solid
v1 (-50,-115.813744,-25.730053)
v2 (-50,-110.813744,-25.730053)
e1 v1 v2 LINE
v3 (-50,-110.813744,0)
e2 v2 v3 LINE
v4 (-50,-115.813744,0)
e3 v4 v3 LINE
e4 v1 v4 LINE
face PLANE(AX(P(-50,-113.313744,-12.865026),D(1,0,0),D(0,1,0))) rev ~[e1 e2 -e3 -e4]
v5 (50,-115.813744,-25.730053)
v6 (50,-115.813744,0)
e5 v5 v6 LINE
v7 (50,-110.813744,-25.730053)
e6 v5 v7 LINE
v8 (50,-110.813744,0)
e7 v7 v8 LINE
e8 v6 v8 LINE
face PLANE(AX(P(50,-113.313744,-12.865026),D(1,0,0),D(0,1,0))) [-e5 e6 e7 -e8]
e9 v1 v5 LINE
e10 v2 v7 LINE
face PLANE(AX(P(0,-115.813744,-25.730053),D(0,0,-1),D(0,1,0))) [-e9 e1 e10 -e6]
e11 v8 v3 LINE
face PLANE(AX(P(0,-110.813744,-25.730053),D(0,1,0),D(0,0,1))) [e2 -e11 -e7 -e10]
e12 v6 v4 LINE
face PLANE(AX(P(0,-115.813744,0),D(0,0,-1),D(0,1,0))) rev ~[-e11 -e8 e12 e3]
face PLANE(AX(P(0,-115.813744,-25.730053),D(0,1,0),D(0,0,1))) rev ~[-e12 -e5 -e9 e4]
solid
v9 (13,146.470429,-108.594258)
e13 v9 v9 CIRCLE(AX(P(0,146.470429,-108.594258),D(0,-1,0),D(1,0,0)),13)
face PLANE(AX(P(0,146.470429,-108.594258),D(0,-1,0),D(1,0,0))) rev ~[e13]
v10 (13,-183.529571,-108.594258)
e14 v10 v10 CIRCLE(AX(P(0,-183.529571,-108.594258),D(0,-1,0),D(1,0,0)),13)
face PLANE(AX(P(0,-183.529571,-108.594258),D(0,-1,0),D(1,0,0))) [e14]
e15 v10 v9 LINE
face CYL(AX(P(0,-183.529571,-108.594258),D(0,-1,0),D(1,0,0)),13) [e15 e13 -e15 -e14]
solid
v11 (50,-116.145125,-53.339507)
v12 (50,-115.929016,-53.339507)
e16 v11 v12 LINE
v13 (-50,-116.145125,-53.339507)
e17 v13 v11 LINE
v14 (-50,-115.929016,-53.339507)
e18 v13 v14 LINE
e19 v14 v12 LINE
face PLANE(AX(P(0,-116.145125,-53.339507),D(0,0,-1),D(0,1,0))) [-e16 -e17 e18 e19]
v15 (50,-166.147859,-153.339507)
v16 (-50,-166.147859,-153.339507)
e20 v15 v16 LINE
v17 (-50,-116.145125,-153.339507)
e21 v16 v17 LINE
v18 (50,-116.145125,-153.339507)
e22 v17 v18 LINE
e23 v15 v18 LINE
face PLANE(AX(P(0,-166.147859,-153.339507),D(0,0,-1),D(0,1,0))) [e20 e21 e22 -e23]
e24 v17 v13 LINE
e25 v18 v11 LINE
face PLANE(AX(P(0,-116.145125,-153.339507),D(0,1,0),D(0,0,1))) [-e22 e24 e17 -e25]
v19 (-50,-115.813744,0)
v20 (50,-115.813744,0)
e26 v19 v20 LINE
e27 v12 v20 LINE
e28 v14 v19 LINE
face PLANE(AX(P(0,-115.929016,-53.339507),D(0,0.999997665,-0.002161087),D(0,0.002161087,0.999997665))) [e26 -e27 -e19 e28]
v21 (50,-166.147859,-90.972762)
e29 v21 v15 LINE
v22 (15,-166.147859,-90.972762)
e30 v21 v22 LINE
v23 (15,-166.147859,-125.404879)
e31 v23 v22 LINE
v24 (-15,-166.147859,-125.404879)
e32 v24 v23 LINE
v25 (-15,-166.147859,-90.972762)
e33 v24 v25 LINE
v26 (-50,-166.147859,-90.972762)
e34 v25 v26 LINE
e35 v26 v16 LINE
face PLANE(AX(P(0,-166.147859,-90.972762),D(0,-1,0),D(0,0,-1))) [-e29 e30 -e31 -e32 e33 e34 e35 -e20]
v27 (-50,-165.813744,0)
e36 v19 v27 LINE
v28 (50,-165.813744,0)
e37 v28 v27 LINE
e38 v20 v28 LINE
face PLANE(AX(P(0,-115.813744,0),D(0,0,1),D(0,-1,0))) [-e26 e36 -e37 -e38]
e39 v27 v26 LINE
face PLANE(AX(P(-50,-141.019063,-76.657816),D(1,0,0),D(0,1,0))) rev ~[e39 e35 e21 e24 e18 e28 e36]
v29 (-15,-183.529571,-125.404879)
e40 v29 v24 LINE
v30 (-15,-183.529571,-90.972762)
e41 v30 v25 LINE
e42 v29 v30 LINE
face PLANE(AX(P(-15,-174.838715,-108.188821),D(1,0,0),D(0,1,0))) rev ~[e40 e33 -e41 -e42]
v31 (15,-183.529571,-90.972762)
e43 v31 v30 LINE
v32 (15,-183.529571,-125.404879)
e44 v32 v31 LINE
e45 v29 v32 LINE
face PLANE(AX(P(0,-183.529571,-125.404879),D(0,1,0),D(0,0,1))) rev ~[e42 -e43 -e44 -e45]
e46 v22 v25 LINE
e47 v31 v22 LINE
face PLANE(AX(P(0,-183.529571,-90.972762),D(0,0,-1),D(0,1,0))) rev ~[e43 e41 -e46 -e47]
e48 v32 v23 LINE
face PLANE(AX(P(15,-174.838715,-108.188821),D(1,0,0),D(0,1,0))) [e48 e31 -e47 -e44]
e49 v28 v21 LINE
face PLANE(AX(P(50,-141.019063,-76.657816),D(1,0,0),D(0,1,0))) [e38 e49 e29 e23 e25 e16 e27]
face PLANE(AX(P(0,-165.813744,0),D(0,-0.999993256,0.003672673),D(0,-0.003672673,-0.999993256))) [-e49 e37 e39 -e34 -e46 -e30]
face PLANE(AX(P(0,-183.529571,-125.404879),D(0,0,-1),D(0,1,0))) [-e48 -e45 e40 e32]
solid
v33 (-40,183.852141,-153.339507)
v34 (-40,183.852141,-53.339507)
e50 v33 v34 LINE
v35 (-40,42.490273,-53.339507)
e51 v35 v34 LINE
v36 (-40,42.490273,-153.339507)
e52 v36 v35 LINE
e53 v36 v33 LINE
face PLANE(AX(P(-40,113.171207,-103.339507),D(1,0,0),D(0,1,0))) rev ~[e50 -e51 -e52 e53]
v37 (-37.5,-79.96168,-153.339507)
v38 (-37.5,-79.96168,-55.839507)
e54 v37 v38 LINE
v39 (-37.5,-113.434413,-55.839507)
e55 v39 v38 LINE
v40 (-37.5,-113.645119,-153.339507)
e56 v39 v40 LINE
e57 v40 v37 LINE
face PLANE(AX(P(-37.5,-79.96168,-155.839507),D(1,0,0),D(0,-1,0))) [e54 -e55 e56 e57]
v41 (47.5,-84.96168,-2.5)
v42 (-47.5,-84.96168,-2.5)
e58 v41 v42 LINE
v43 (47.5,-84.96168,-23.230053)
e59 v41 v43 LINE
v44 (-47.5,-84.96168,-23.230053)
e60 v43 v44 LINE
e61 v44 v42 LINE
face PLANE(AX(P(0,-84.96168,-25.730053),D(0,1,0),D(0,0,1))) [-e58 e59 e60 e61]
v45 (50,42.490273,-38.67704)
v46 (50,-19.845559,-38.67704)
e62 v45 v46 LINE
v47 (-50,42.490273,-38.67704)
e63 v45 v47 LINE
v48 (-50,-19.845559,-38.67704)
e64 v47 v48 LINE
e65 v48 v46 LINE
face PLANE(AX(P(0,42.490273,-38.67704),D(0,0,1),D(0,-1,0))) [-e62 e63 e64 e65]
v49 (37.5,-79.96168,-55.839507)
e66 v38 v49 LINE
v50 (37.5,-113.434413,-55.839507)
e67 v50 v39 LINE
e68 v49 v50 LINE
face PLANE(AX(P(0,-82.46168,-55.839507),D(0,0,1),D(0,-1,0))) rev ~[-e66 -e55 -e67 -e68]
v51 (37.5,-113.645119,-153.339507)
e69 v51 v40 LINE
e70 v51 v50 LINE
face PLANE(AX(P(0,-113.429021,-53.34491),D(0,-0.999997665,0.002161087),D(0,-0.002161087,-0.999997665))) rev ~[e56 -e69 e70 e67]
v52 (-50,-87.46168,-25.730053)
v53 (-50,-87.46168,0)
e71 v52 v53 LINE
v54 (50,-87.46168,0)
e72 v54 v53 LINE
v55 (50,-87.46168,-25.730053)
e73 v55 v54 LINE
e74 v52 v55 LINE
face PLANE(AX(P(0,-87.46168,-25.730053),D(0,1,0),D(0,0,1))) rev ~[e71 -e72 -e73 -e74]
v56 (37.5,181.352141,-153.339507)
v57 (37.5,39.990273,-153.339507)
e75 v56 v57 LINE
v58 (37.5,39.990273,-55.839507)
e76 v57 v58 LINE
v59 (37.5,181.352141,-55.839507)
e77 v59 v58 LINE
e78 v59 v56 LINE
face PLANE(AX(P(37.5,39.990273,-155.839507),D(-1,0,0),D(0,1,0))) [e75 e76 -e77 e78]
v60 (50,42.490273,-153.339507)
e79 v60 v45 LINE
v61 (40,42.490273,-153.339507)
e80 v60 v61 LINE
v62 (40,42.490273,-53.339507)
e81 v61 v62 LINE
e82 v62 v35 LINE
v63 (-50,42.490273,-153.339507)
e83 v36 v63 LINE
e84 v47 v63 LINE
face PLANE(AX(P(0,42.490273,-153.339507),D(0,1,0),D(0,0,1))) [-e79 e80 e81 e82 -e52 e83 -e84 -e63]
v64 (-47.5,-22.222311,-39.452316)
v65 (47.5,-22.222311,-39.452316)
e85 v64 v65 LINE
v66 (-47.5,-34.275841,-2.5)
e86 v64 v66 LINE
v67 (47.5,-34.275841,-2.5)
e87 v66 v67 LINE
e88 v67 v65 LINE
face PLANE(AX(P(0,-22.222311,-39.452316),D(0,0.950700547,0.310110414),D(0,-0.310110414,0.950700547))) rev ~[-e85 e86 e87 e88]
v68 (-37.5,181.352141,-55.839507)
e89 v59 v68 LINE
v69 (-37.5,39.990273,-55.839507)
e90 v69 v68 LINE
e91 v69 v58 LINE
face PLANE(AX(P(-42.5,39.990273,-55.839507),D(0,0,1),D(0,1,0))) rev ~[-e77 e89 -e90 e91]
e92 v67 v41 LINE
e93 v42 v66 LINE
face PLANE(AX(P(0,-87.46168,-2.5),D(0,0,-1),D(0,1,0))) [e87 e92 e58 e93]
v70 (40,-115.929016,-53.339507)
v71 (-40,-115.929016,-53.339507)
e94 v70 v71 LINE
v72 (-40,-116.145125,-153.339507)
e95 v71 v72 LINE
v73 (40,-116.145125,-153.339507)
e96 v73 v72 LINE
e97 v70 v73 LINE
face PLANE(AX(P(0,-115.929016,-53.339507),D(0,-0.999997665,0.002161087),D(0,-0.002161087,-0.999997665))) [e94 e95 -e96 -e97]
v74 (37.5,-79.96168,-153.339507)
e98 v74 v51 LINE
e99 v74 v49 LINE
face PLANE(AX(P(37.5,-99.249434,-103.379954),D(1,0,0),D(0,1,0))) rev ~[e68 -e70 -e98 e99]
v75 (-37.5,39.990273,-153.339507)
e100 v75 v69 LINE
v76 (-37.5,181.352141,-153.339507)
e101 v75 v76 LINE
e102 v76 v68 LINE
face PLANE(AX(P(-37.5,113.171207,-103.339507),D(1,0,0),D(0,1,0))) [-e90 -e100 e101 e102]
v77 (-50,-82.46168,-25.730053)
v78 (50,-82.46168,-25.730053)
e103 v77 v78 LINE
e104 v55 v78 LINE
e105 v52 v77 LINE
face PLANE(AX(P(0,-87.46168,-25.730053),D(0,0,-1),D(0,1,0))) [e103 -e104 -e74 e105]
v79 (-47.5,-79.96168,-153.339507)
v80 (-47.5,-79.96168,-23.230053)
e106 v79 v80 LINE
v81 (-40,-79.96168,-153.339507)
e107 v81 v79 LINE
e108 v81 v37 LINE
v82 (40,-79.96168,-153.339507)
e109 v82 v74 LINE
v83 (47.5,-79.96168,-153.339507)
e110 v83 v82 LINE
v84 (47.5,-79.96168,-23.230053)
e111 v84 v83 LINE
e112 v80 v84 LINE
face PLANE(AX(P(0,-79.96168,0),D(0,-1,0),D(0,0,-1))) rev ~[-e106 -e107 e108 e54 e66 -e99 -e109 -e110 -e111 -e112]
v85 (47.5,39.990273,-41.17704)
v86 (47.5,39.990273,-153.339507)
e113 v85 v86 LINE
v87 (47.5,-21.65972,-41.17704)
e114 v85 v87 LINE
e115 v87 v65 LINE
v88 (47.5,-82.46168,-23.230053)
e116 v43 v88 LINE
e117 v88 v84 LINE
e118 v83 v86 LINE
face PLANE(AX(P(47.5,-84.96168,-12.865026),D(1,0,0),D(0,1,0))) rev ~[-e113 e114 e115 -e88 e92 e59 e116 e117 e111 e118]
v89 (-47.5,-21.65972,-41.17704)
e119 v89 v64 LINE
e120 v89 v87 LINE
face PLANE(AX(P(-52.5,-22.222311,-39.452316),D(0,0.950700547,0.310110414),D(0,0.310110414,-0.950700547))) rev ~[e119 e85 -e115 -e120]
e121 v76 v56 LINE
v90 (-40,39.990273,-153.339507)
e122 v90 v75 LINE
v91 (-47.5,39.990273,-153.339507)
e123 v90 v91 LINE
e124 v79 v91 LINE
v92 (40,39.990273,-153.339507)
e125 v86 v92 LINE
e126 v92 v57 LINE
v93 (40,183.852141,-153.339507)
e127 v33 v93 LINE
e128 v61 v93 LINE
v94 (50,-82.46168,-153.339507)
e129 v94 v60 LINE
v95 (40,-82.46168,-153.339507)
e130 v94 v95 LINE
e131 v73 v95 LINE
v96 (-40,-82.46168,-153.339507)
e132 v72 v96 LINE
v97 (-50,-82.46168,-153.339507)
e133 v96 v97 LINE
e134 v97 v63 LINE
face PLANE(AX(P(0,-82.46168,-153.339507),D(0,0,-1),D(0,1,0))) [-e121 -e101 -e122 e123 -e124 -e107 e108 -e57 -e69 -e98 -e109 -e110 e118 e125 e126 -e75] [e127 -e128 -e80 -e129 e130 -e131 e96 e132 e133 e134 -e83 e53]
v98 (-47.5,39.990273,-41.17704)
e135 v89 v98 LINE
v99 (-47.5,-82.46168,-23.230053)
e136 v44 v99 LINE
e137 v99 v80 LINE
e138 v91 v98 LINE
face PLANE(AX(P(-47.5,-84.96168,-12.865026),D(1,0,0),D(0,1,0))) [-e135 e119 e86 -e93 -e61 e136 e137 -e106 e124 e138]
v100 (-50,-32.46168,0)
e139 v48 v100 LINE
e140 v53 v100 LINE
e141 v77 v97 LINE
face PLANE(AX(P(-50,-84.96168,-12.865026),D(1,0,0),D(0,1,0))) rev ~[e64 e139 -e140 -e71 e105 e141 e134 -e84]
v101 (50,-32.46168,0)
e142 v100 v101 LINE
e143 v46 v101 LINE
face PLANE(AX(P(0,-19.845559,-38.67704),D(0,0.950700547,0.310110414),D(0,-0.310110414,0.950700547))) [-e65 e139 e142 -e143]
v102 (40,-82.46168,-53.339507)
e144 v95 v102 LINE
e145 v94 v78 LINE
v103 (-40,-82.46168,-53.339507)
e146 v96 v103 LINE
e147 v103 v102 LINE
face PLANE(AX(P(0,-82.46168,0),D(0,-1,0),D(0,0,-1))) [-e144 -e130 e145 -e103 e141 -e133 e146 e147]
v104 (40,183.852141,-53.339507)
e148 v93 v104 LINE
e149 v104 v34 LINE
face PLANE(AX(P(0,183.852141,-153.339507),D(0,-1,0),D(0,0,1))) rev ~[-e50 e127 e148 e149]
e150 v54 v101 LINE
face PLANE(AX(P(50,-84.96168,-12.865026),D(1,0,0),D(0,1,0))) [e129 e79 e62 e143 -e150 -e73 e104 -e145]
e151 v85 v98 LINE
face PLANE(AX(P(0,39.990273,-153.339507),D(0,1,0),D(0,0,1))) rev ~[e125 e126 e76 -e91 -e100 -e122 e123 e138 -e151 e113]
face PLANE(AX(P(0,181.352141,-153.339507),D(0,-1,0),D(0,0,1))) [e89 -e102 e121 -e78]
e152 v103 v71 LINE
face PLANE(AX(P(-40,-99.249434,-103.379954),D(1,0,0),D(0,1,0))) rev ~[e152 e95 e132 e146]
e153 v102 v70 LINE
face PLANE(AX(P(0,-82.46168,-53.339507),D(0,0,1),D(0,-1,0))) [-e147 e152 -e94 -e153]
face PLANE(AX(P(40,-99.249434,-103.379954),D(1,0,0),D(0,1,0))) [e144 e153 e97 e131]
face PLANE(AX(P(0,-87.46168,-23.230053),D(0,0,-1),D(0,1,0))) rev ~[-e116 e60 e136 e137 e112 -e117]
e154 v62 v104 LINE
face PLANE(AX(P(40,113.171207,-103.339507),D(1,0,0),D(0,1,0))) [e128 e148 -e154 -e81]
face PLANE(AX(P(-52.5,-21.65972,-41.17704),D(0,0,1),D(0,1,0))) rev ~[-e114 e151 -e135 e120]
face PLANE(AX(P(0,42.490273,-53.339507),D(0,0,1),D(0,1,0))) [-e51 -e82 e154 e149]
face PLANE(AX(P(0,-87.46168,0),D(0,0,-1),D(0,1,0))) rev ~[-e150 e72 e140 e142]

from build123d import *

# Parameters (mm, degrees)
F0_W        = 124.9519532199
F0_H        = 100
F1_DEPTH    = 50
F0_W_2      = 141.3618674554
F2_DEPTH    = 40
F0_W_3      = 5
F0_H_2      = 25.7300529629
F3_DEPTH    = 50
F4_DEPTH    = 50
F0_W_4      = 17.3817112001
F0_H_3      = 34.4321173714
F5_DEPTH    = 15
F6_T        = 2.5
F6_T3_DEPTH = 105
F6_T5_DEPTH = 105
F6_T7_DEPTH = 85
F7_R        = 13
F8_DEPTH    = 330


# Not quite as in the source:
# - a shell that OpenCascade refuses in one call is made with other operations: the cavity is built on its own and cut out


with BuildPart() as f1:
    # F0 (on Right) → F1 (new body, symmetric)
    with BuildSketch(Plane.YZ):
        Polygon((-82.4616801739, -53.3395072201), (42.490273046, -53.3395072201), (42.490273046, -38.6770403606), (0, -38.6770403606), (-19.8455593103, -38.6770403606), (-32.4616801739, 0), (-77.4616801739, 0), (-82.4616801739, 0), (-82.4616801739, -25.7300529629), align=None)
        with Locations((-19.9857035639, -103.3395072201)):
            Rectangle(F0_W, F0_H)
    extrude(amount=F1_DEPTH, both=True)

    # F0 (on Right) → F2 (join, symmetric)
    with BuildSketch(Plane.YZ):
        with Locations((113.1712067737, -103.3395072201)):
            Rectangle(F0_W_2, F0_H)
        Polygon((-116.1451248146, -153.3395072201), (-82.4616801739, -153.3395072201), (-82.4616801739, -53.3395072201), (-115.929015638, -53.3395072201), align=None)
    extrude(amount=F2_DEPTH, both=True)

    # F0 (on Right) → F3, piece 2 (join, symmetric)
    with BuildSketch(Plane.YZ):
        Polygon((-82.4616801739, -53.3395072201), (42.490273046, -53.3395072201), (42.490273046, -38.6770403606), (0, -38.6770403606), (-19.8455593103, -38.6770403606), (-32.4616801739, 0), (-77.4616801739, 0), (-82.4616801739, 0), (-82.4616801739, -25.7300529629), align=None)
    extrude(amount=F3_DEPTH, both=True)

    # F0 (on Right) → F4 (join, symmetric)
    with BuildSketch(Plane.YZ):
        with Locations((-84.9616801739, -12.8650264814)):
            Rectangle(F0_W_3, F0_H_2)
    extrude(amount=F4_DEPTH, both=True)

    # F6: shell of thickness 2.5, made by hand


with BuildPart() as f1b:
    # F0 (on Right) → F1, piece 2 (new body, symmetric)
    with BuildSketch(Plane.YZ):
        Polygon((-166.1478594986, -153.3395072201), (-116.1451248146, -153.3395072201), (-116.1451248146, -53.3395072201), (-115.929015638, -53.3395072201), (-115.8137440681, 0), (-165.8137440681, 0), (-166.1478594986, -90.9727620794), (-166.1478594986, -125.4048794508), align=None)
    extrude(amount=F1_DEPTH, both=True)

    # F0 (on Right) → F5 (join, symmetric)
    with BuildSketch(Plane.YZ):
        with Locations((-174.8387150987, -108.1888207651)):
            Rectangle(F0_W_4, F0_H_3)
    extrude(amount=F5_DEPTH, both=True)


with BuildPart() as f3:
    # F0 (on Right) → F3 (new body, symmetric)
    with BuildSketch(Plane.YZ):
        with Locations((-113.3137440681, -12.8650264814)):
            Rectangle(F0_W_3, F0_H_2)
    extrude(amount=F3_DEPTH, both=True)


with BuildPart() as f6_core1:
    # F6_t2: copy of F1
    add(f1.part)

    # the walls: a layer under each face that stays
    f6_faces = [f6_core1.faces().sort_by_distance(p)[0] for p in [
        (-33.3333333333, -82.4616801739, -46.9982953391),
        (-50, -22.4857035639, -76.66975361),
        (0, -87.4616801739, -12.8650264814),
        (0, -59.9616801739, 0),
        (0, -26.1536197421, -19.3385201803),
        (0, 11.3223568678, -38.6770403606),
        (-42.8571428571, 42.490273046, -145.1493310158),
        (40, 113.1712067737, -103.3395072201),
        (0, 183.8521405014, -103.3395072201),
        (-40, 113.1712067737, -103.3395072201),
        (0, 113.1712067737, -53.3395072201),
        (-40, -99.3034024943, -103.3395072201),
        (0, -116.0370702263, -103.3395072201),
        (0, -99.1953479059, -53.3395072201),
        (40, -99.3034024943, -103.3395072201),
        (50, -22.4857035639, -76.66975361),
        (0, -84.9616801739, -25.7300529629),
    ]]
    thicken(f6_faces, amount=-F6_T, mode=Mode.SUBTRACT)

    # F6_s4 → F6_t3 (cut)
    with BuildSketch(Plane.YZ.offset(-52.5)):
        Polygon((-82.4866801739, -25.7550529629), (-79.9616801739, -25.7300529629), (-79.9616801739, -23.2300529629), (-82.4616801739, -23.2300529629), align=None)
        Polygon((-19.8217917967, -38.6442876003), (-22.222310679, -39.4523163965), (-21.6597204242, -41.1770403606), (-19.8455593103, -41.1770403606), align=None)
    extrude(amount=F6_T3_DEPTH, mode=Mode.SUBTRACT)

    # F6_s6 → F6_t5 (cut)
    with BuildSketch(Plane.XY.offset(-155.8395072201)):
        Polygon((40.025, -82.4866801739), (40, -79.9616801739), (37.5, -79.9616801739), (37.5, -82.4616801739), align=None)
        Polygon((-40.025, -82.4866801739), (-40, -79.9616801739), (-37.5, -79.9616801739), (-37.5, -82.4616801739), align=None)
        Polygon((-40.025, 42.515273046), (-40, 39.990273046), (-37.5, 39.990273046), (-37.5, 42.490273046), align=None)
        Polygon((40.025, 42.515273046), (40, 39.990273046), (37.5, 39.990273046), (37.5, 42.490273046), align=None)
    extrude(amount=F6_T5_DEPTH, mode=Mode.SUBTRACT)

    # F6_s8 → F6_t7 (cut)
    with BuildSketch(Plane.YZ.offset(-42.5)):
        Polygon((-82.4866801739, -53.3145072201), (-79.9616801739, -53.3395072201), (-79.9616801739, -55.8395072201), (-82.4616801739, -55.8395072201), align=None)
        Polygon((42.515273046, -53.3145072201), (39.990273046, -53.3395072201), (39.990273046, -55.8395072201), (42.490273046, -55.8395072201), align=None)
    extrude(amount=F6_T7_DEPTH, mode=Mode.SUBTRACT)


with BuildPart() as f1_1:
    add(f1.part)

    # what is left inside the walls is the cavity
    f6_cavity = [f6_core1.part.solids().sort_by_distance(p)[0] for p in [
        (-15.833333, 33.853511, -153.314507),
    ]]
    add(f6_cavity, mode=Mode.SUBTRACT)


with BuildPart() as f8:
    # F7 (on face) → F8 (new body)
    with BuildSketch(Plane.XZ.offset(183.5295706987)):
        with Locations((0, -108.5942578374)):
            Circle(F7_R)
    extrude(amount=-F8_DEPTH)


solid = Compound([f1b.part, f3.part, f1_1.part, f8.part])
